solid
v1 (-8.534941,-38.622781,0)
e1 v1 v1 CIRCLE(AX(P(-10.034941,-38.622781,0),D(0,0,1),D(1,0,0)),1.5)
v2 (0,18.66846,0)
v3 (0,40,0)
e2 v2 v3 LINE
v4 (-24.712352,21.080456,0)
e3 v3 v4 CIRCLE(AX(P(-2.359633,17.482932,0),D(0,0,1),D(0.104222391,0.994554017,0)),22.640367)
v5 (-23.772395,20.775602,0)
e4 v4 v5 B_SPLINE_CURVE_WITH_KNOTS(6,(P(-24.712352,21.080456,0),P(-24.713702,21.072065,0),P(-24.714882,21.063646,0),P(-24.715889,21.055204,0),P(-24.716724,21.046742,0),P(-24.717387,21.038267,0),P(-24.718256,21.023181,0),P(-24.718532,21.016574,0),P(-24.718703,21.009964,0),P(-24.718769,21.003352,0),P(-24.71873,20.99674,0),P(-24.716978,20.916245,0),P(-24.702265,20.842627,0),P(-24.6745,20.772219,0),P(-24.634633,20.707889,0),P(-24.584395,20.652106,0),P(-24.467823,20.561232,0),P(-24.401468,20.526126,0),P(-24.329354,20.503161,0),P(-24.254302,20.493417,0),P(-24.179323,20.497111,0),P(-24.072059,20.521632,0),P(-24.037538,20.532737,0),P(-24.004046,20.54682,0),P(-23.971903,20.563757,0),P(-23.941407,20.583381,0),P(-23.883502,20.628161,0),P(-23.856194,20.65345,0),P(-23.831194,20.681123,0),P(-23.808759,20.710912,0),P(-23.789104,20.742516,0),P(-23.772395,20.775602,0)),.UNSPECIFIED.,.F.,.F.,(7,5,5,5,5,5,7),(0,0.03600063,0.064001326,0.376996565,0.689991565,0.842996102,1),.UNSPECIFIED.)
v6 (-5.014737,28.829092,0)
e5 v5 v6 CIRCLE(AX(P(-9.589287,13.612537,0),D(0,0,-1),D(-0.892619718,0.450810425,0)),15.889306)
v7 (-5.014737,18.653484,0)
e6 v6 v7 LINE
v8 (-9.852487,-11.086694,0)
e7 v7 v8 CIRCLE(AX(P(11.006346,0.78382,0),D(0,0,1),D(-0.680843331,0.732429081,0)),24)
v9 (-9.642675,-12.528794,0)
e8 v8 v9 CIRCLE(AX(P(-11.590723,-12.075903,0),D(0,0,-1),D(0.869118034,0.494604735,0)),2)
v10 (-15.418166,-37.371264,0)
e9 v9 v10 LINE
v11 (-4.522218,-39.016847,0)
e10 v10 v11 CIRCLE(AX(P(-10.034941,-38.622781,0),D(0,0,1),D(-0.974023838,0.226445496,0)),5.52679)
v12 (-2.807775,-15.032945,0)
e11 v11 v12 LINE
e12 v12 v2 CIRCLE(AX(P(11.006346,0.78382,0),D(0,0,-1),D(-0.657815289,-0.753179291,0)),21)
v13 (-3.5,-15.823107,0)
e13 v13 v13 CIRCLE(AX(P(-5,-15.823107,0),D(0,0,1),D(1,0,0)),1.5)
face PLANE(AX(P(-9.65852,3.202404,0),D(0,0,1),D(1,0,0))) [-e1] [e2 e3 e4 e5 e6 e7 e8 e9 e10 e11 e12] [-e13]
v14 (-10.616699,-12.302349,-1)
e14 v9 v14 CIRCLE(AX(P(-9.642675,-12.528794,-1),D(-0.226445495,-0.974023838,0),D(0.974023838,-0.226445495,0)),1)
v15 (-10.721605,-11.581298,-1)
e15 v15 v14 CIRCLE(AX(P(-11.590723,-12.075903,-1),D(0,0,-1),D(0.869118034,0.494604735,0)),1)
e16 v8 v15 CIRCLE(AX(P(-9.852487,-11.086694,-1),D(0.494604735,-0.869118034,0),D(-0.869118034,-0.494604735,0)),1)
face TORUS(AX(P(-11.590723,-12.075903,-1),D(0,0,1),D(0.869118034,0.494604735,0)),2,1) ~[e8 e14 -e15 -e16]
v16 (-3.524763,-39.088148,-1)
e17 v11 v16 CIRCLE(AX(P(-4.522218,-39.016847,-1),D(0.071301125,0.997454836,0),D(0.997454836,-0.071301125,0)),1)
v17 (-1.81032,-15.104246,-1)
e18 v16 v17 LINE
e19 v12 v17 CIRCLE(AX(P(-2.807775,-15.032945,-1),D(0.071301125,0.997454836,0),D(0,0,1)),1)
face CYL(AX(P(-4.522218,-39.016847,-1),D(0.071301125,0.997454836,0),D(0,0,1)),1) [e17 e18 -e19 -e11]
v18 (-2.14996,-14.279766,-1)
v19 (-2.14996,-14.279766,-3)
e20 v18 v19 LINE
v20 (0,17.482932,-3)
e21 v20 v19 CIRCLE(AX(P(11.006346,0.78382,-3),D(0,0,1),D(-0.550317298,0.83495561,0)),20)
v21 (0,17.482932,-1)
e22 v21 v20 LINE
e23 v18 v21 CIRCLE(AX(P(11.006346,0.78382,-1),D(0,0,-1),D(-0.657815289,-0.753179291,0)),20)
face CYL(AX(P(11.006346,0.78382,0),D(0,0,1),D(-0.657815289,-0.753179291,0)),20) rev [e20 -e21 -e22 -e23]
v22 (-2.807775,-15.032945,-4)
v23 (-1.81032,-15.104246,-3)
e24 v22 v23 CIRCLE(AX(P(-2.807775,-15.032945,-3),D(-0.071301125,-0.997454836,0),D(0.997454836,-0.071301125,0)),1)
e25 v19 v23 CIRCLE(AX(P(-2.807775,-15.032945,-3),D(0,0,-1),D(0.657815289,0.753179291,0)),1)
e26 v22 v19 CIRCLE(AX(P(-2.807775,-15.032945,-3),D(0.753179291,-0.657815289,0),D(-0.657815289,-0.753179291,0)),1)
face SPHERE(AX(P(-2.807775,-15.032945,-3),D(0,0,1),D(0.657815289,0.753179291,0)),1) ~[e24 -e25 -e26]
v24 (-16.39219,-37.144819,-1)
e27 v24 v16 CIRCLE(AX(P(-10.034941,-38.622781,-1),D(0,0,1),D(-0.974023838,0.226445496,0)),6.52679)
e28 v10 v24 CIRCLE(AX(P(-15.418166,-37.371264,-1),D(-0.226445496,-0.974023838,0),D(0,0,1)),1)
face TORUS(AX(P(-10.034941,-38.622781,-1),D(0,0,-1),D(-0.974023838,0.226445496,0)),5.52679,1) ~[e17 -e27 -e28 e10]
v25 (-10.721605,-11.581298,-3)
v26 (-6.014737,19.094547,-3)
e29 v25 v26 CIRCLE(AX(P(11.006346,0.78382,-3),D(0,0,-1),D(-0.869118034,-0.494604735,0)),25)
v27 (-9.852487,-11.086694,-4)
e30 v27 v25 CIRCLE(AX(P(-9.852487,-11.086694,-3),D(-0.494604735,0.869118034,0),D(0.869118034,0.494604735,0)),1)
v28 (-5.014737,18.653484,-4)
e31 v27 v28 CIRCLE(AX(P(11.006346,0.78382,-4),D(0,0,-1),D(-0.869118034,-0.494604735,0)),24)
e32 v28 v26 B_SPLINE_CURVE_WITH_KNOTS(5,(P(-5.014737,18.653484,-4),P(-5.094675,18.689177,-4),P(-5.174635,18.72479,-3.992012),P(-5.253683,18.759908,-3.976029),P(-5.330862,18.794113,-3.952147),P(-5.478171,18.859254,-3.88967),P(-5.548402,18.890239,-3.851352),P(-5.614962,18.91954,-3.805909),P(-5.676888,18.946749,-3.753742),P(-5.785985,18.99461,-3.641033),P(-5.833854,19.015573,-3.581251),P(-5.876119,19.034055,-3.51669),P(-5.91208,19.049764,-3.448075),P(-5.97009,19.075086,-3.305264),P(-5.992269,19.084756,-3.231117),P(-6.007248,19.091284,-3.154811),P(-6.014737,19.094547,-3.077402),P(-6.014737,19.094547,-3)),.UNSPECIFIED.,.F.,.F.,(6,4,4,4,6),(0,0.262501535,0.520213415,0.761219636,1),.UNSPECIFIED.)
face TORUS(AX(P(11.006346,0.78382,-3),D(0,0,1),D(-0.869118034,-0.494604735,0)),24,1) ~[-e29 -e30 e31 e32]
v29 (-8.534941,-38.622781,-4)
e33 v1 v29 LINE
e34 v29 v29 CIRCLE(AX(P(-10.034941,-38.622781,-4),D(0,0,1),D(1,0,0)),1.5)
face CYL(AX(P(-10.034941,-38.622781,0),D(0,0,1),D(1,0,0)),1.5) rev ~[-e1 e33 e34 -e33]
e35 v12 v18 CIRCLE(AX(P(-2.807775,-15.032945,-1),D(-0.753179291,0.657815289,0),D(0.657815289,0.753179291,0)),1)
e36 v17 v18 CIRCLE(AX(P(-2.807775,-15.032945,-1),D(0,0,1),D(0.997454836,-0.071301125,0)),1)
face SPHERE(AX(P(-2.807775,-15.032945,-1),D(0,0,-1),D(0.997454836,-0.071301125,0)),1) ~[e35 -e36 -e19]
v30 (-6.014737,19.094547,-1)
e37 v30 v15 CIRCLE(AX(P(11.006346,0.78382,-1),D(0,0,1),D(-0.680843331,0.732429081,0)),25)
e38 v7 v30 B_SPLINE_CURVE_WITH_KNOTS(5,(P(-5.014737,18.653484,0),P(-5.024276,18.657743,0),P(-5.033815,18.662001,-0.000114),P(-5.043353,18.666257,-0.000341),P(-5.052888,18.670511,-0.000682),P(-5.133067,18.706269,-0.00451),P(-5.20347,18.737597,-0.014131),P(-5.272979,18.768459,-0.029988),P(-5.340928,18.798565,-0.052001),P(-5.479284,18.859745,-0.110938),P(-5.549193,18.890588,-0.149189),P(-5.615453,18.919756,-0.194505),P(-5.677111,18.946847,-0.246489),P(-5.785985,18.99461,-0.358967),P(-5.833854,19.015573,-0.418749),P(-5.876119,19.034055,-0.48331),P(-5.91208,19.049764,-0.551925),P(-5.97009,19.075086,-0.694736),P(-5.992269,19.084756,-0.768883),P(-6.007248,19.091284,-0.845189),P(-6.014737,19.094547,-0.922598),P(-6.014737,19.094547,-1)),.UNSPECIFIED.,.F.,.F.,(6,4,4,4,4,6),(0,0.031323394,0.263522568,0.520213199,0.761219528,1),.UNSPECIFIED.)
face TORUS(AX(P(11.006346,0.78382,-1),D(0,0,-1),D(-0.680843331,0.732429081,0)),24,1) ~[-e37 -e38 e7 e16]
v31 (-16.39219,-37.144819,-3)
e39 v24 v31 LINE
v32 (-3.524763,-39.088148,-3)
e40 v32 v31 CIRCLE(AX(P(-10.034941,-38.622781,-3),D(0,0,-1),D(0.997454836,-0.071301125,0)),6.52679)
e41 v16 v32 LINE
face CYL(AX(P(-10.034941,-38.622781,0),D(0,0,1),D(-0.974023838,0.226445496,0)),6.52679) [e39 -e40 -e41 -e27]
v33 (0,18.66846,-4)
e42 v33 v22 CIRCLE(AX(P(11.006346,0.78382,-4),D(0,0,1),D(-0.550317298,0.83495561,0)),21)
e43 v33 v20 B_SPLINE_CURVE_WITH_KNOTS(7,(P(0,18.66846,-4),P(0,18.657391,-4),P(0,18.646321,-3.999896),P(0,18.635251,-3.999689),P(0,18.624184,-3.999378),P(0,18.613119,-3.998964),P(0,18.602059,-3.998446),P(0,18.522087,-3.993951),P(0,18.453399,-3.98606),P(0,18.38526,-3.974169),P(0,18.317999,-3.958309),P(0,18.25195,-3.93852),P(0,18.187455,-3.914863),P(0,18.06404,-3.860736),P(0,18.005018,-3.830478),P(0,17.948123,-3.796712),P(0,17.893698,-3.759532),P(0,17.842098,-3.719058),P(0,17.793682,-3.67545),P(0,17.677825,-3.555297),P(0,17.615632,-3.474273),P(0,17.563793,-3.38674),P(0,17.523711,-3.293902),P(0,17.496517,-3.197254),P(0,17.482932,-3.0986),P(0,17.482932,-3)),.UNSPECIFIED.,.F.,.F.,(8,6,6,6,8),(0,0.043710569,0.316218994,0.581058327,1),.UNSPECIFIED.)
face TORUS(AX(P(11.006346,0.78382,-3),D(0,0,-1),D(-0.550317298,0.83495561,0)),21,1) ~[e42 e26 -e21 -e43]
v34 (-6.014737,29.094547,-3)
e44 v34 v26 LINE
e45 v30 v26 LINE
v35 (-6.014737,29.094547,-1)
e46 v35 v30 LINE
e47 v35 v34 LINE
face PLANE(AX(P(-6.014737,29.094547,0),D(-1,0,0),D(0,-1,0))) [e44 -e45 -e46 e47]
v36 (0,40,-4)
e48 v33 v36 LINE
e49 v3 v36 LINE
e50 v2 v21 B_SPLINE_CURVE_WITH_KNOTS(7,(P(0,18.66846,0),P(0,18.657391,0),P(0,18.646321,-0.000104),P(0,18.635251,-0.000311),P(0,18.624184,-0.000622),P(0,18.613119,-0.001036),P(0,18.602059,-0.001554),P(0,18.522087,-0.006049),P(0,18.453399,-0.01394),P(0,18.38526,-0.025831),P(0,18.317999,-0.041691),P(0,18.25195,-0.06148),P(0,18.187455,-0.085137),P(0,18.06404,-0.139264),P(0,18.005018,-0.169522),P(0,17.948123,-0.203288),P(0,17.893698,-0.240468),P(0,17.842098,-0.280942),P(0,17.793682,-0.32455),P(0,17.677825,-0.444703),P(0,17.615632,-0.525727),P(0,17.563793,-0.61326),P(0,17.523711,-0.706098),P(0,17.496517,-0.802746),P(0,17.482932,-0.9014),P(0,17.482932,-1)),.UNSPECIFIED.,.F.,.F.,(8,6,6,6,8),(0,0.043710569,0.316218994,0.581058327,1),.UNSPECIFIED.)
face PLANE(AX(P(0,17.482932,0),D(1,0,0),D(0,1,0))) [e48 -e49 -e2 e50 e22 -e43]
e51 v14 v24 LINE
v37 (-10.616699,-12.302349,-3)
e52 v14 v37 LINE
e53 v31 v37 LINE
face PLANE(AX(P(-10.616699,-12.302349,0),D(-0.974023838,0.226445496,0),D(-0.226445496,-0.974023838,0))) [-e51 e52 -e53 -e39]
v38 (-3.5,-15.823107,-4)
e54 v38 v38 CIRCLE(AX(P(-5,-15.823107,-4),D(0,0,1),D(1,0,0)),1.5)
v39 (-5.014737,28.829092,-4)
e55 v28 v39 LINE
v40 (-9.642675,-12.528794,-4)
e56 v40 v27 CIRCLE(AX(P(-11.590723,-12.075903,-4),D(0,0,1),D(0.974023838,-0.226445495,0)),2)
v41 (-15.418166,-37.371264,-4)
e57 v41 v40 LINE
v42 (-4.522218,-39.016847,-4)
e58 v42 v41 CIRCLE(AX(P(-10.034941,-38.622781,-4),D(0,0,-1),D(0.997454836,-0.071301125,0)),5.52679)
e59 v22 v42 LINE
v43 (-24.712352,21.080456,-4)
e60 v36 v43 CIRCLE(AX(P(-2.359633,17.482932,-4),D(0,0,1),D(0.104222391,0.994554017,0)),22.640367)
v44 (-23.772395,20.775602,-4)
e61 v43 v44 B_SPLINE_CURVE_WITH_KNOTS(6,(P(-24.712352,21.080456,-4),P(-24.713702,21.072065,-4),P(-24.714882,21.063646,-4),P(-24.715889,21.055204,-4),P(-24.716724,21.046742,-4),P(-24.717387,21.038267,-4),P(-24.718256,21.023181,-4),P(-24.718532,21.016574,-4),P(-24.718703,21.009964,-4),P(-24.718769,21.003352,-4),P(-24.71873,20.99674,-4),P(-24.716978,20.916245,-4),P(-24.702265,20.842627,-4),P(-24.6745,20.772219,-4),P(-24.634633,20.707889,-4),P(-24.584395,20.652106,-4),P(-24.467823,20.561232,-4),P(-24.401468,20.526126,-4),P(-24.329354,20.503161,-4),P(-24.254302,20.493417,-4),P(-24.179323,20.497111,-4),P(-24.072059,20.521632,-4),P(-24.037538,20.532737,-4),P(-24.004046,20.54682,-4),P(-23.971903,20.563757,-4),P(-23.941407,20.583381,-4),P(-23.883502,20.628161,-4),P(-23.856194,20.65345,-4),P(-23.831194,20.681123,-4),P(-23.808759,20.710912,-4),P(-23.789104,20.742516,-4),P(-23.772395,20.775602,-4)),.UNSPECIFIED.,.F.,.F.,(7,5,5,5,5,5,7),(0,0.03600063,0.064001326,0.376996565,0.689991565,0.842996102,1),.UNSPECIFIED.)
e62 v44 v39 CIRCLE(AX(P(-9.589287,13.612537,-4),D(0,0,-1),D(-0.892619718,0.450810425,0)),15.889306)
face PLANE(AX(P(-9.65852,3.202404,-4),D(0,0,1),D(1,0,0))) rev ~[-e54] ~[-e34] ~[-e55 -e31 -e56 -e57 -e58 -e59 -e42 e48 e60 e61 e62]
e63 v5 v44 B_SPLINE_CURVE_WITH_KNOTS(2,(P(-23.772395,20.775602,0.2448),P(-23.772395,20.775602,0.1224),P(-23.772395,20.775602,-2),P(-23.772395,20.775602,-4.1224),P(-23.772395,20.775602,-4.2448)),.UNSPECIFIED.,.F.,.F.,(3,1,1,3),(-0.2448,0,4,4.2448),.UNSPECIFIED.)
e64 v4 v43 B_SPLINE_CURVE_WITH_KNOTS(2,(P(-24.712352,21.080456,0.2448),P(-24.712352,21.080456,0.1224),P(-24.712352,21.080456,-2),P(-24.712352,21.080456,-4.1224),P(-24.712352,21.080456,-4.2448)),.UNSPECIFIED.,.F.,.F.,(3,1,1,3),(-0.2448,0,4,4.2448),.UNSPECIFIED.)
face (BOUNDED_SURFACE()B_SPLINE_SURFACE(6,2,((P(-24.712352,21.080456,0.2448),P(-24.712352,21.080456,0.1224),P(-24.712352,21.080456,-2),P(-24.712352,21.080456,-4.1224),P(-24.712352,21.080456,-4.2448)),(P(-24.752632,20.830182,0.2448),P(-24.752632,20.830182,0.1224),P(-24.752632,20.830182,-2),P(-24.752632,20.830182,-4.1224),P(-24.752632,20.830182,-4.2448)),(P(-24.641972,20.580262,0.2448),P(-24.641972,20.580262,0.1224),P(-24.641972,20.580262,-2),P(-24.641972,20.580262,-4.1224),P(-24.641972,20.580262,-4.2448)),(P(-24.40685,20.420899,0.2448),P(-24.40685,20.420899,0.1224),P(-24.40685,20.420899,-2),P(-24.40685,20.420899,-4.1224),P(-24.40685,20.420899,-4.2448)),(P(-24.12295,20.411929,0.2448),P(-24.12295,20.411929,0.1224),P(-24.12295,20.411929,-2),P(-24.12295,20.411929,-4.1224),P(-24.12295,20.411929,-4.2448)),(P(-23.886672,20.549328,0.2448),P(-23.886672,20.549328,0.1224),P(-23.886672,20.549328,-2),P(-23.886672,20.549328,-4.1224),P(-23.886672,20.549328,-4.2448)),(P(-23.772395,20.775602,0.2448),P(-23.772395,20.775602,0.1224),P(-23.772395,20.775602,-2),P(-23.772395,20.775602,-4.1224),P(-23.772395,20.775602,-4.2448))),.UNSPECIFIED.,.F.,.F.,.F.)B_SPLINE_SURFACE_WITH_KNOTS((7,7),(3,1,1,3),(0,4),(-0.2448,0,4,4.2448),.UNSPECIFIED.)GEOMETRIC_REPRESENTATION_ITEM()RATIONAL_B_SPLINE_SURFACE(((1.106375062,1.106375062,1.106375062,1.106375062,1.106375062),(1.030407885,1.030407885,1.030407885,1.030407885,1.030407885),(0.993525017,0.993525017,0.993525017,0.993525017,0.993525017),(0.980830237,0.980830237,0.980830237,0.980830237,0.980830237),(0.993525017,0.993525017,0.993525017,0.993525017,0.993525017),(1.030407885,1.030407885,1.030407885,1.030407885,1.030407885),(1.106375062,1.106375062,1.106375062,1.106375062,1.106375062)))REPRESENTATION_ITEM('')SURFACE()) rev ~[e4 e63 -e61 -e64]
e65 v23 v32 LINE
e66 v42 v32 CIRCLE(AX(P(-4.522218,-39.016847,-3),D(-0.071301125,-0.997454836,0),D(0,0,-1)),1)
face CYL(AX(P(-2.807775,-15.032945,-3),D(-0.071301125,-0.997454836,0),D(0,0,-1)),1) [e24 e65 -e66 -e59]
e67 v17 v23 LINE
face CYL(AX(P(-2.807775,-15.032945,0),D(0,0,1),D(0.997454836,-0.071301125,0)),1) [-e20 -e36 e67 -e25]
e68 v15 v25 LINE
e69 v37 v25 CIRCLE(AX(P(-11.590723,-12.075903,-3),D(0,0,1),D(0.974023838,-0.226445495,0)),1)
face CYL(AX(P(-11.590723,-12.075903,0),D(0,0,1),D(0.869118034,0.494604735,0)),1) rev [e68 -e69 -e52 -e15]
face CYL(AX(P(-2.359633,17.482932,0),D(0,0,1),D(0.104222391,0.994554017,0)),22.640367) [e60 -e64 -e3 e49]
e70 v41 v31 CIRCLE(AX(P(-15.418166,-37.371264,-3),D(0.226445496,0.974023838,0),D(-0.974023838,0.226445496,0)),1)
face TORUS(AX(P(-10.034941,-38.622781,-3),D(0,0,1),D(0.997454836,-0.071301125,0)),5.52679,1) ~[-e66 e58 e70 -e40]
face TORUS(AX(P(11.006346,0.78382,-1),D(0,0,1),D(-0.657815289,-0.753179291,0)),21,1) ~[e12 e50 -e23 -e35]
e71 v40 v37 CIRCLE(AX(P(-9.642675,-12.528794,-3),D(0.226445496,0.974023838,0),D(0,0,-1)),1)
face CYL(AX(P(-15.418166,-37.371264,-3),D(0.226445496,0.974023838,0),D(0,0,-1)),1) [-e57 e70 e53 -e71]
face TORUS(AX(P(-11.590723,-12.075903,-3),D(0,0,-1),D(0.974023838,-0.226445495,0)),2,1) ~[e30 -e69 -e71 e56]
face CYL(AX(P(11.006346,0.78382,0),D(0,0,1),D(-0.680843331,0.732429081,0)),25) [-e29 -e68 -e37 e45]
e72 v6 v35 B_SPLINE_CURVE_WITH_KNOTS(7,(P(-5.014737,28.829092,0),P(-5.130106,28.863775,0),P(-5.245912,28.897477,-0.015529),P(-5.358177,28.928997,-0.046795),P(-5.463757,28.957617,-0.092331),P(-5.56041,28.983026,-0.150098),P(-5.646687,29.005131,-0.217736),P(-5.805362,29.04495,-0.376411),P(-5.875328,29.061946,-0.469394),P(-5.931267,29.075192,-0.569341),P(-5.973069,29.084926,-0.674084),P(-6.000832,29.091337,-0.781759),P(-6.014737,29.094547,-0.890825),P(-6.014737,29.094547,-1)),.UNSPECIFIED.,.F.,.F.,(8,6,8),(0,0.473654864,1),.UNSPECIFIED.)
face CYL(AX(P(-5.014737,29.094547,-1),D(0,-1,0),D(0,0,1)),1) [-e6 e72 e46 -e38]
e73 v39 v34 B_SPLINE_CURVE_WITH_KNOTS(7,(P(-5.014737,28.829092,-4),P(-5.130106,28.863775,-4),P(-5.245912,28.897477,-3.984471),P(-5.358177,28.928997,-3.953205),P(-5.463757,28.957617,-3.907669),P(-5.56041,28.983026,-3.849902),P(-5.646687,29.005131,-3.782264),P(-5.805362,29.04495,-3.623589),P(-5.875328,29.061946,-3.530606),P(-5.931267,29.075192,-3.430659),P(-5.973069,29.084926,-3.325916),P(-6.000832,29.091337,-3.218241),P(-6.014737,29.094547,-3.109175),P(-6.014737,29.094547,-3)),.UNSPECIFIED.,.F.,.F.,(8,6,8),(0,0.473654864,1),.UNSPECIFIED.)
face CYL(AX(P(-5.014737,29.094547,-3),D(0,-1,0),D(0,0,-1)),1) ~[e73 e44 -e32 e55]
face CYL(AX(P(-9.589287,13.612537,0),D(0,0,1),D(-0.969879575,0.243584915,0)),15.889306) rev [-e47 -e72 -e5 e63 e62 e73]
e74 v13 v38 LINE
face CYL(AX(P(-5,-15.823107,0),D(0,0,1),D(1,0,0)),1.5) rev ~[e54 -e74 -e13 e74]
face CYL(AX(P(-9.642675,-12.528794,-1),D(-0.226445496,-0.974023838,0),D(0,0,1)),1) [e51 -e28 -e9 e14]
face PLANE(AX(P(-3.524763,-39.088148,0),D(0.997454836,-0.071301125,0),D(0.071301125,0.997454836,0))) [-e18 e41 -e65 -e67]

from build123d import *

# Parameters (mm, degrees)
F1_DEPTH = 4
F2_R     = 0.5
F3_R     = 1
F4_R     = 1
F5_R     = 1.5
F6_DEPTH = 25.4


# Not quite as in the source:
# - a feature names something its author has since deleted; it is built from what else it names


with BuildPart() as f1:
    # F0 (on Top) → F1 (new body)
    with BuildSketch(Plane.XY):
        with BuildLine():
            ThreePointArc((-2.1499598203, -14.279765827), (-8.9479939511, 2.1344933303), (0, 17.482932208))
            Line((0, 17.482932208), (0, 40))
            ThreePointArc((0, 40), (-17.5115843593, 34.3056723382), (-25, 17.482932208))
            ThreePointArc((-25, 17.482932208), (-17.8797085459, 27.1675710157), (-6.0147373006, 29.0945470333))
            Line((-6.0147373006, 29.0945470333), (-6.0147373006, 19.0945470333))
            ThreePointArc((-6.0147373006, 19.0945470333), (-13.7044570112, 4.575418106), (-10.7216048739, -11.5812983662))
            ThreePointArc((-10.7216048739, -11.5812983662), (-10.6011415068, -11.9319286193), (-10.6166990692, -12.3023485965))
            Line((-10.6166990692, -12.3023485965), (-16.3921895572, -37.1448185197))
            ThreePointArc((-16.3921895572, -37.1448185197), (-11.0096096716, -45.0763845561), (-3.5247629898, -39.0881480742))
            Line((-3.5247629898, -39.0881480742), (-1.8103202737, -15.1042462433))
            ThreePointArc((-1.8103202737, -15.1042462433), (-1.8831553034, -14.6520537771), (-2.1499598203, -14.279765827))
        make_face()
    extrude(amount=-F1_DEPTH)

    # F2
    f2_edges = [f1.edges().sort_by_distance(p)[0] for p in [
        (-25, 17.482932, -2),
    ]]
    fillet(f2_edges, radius=F2_R)

    # F3
    f3_edges = [f1.edges().sort_by_distance(p)[0] for p in [
        (-6.014737, 24.094547, 0),
        (-6.014737, 24.094547, -4),
        (-13.704457, 4.575418, 0),
    ]]
    fillet(f3_edges, radius=F3_R)

    # F4
    f4_edges = [f1.edges().sort_by_distance(p)[0] for p in [
        (-13.704457, 4.575418, -4),
    ]]
    fillet(f4_edges, radius=F4_R)

    # F5 (on face) → F6 (cut)
    with BuildSketch(Plane.XY):
        with Locations((-5, -15.8231072128)):
            Circle(F5_R)
        with Locations((-10.0349408695, -38.6227806321)):
            Circle(F5_R)
    extrude(amount=-F6_DEPTH, mode=Mode.SUBTRACT)


solid = f1.part
